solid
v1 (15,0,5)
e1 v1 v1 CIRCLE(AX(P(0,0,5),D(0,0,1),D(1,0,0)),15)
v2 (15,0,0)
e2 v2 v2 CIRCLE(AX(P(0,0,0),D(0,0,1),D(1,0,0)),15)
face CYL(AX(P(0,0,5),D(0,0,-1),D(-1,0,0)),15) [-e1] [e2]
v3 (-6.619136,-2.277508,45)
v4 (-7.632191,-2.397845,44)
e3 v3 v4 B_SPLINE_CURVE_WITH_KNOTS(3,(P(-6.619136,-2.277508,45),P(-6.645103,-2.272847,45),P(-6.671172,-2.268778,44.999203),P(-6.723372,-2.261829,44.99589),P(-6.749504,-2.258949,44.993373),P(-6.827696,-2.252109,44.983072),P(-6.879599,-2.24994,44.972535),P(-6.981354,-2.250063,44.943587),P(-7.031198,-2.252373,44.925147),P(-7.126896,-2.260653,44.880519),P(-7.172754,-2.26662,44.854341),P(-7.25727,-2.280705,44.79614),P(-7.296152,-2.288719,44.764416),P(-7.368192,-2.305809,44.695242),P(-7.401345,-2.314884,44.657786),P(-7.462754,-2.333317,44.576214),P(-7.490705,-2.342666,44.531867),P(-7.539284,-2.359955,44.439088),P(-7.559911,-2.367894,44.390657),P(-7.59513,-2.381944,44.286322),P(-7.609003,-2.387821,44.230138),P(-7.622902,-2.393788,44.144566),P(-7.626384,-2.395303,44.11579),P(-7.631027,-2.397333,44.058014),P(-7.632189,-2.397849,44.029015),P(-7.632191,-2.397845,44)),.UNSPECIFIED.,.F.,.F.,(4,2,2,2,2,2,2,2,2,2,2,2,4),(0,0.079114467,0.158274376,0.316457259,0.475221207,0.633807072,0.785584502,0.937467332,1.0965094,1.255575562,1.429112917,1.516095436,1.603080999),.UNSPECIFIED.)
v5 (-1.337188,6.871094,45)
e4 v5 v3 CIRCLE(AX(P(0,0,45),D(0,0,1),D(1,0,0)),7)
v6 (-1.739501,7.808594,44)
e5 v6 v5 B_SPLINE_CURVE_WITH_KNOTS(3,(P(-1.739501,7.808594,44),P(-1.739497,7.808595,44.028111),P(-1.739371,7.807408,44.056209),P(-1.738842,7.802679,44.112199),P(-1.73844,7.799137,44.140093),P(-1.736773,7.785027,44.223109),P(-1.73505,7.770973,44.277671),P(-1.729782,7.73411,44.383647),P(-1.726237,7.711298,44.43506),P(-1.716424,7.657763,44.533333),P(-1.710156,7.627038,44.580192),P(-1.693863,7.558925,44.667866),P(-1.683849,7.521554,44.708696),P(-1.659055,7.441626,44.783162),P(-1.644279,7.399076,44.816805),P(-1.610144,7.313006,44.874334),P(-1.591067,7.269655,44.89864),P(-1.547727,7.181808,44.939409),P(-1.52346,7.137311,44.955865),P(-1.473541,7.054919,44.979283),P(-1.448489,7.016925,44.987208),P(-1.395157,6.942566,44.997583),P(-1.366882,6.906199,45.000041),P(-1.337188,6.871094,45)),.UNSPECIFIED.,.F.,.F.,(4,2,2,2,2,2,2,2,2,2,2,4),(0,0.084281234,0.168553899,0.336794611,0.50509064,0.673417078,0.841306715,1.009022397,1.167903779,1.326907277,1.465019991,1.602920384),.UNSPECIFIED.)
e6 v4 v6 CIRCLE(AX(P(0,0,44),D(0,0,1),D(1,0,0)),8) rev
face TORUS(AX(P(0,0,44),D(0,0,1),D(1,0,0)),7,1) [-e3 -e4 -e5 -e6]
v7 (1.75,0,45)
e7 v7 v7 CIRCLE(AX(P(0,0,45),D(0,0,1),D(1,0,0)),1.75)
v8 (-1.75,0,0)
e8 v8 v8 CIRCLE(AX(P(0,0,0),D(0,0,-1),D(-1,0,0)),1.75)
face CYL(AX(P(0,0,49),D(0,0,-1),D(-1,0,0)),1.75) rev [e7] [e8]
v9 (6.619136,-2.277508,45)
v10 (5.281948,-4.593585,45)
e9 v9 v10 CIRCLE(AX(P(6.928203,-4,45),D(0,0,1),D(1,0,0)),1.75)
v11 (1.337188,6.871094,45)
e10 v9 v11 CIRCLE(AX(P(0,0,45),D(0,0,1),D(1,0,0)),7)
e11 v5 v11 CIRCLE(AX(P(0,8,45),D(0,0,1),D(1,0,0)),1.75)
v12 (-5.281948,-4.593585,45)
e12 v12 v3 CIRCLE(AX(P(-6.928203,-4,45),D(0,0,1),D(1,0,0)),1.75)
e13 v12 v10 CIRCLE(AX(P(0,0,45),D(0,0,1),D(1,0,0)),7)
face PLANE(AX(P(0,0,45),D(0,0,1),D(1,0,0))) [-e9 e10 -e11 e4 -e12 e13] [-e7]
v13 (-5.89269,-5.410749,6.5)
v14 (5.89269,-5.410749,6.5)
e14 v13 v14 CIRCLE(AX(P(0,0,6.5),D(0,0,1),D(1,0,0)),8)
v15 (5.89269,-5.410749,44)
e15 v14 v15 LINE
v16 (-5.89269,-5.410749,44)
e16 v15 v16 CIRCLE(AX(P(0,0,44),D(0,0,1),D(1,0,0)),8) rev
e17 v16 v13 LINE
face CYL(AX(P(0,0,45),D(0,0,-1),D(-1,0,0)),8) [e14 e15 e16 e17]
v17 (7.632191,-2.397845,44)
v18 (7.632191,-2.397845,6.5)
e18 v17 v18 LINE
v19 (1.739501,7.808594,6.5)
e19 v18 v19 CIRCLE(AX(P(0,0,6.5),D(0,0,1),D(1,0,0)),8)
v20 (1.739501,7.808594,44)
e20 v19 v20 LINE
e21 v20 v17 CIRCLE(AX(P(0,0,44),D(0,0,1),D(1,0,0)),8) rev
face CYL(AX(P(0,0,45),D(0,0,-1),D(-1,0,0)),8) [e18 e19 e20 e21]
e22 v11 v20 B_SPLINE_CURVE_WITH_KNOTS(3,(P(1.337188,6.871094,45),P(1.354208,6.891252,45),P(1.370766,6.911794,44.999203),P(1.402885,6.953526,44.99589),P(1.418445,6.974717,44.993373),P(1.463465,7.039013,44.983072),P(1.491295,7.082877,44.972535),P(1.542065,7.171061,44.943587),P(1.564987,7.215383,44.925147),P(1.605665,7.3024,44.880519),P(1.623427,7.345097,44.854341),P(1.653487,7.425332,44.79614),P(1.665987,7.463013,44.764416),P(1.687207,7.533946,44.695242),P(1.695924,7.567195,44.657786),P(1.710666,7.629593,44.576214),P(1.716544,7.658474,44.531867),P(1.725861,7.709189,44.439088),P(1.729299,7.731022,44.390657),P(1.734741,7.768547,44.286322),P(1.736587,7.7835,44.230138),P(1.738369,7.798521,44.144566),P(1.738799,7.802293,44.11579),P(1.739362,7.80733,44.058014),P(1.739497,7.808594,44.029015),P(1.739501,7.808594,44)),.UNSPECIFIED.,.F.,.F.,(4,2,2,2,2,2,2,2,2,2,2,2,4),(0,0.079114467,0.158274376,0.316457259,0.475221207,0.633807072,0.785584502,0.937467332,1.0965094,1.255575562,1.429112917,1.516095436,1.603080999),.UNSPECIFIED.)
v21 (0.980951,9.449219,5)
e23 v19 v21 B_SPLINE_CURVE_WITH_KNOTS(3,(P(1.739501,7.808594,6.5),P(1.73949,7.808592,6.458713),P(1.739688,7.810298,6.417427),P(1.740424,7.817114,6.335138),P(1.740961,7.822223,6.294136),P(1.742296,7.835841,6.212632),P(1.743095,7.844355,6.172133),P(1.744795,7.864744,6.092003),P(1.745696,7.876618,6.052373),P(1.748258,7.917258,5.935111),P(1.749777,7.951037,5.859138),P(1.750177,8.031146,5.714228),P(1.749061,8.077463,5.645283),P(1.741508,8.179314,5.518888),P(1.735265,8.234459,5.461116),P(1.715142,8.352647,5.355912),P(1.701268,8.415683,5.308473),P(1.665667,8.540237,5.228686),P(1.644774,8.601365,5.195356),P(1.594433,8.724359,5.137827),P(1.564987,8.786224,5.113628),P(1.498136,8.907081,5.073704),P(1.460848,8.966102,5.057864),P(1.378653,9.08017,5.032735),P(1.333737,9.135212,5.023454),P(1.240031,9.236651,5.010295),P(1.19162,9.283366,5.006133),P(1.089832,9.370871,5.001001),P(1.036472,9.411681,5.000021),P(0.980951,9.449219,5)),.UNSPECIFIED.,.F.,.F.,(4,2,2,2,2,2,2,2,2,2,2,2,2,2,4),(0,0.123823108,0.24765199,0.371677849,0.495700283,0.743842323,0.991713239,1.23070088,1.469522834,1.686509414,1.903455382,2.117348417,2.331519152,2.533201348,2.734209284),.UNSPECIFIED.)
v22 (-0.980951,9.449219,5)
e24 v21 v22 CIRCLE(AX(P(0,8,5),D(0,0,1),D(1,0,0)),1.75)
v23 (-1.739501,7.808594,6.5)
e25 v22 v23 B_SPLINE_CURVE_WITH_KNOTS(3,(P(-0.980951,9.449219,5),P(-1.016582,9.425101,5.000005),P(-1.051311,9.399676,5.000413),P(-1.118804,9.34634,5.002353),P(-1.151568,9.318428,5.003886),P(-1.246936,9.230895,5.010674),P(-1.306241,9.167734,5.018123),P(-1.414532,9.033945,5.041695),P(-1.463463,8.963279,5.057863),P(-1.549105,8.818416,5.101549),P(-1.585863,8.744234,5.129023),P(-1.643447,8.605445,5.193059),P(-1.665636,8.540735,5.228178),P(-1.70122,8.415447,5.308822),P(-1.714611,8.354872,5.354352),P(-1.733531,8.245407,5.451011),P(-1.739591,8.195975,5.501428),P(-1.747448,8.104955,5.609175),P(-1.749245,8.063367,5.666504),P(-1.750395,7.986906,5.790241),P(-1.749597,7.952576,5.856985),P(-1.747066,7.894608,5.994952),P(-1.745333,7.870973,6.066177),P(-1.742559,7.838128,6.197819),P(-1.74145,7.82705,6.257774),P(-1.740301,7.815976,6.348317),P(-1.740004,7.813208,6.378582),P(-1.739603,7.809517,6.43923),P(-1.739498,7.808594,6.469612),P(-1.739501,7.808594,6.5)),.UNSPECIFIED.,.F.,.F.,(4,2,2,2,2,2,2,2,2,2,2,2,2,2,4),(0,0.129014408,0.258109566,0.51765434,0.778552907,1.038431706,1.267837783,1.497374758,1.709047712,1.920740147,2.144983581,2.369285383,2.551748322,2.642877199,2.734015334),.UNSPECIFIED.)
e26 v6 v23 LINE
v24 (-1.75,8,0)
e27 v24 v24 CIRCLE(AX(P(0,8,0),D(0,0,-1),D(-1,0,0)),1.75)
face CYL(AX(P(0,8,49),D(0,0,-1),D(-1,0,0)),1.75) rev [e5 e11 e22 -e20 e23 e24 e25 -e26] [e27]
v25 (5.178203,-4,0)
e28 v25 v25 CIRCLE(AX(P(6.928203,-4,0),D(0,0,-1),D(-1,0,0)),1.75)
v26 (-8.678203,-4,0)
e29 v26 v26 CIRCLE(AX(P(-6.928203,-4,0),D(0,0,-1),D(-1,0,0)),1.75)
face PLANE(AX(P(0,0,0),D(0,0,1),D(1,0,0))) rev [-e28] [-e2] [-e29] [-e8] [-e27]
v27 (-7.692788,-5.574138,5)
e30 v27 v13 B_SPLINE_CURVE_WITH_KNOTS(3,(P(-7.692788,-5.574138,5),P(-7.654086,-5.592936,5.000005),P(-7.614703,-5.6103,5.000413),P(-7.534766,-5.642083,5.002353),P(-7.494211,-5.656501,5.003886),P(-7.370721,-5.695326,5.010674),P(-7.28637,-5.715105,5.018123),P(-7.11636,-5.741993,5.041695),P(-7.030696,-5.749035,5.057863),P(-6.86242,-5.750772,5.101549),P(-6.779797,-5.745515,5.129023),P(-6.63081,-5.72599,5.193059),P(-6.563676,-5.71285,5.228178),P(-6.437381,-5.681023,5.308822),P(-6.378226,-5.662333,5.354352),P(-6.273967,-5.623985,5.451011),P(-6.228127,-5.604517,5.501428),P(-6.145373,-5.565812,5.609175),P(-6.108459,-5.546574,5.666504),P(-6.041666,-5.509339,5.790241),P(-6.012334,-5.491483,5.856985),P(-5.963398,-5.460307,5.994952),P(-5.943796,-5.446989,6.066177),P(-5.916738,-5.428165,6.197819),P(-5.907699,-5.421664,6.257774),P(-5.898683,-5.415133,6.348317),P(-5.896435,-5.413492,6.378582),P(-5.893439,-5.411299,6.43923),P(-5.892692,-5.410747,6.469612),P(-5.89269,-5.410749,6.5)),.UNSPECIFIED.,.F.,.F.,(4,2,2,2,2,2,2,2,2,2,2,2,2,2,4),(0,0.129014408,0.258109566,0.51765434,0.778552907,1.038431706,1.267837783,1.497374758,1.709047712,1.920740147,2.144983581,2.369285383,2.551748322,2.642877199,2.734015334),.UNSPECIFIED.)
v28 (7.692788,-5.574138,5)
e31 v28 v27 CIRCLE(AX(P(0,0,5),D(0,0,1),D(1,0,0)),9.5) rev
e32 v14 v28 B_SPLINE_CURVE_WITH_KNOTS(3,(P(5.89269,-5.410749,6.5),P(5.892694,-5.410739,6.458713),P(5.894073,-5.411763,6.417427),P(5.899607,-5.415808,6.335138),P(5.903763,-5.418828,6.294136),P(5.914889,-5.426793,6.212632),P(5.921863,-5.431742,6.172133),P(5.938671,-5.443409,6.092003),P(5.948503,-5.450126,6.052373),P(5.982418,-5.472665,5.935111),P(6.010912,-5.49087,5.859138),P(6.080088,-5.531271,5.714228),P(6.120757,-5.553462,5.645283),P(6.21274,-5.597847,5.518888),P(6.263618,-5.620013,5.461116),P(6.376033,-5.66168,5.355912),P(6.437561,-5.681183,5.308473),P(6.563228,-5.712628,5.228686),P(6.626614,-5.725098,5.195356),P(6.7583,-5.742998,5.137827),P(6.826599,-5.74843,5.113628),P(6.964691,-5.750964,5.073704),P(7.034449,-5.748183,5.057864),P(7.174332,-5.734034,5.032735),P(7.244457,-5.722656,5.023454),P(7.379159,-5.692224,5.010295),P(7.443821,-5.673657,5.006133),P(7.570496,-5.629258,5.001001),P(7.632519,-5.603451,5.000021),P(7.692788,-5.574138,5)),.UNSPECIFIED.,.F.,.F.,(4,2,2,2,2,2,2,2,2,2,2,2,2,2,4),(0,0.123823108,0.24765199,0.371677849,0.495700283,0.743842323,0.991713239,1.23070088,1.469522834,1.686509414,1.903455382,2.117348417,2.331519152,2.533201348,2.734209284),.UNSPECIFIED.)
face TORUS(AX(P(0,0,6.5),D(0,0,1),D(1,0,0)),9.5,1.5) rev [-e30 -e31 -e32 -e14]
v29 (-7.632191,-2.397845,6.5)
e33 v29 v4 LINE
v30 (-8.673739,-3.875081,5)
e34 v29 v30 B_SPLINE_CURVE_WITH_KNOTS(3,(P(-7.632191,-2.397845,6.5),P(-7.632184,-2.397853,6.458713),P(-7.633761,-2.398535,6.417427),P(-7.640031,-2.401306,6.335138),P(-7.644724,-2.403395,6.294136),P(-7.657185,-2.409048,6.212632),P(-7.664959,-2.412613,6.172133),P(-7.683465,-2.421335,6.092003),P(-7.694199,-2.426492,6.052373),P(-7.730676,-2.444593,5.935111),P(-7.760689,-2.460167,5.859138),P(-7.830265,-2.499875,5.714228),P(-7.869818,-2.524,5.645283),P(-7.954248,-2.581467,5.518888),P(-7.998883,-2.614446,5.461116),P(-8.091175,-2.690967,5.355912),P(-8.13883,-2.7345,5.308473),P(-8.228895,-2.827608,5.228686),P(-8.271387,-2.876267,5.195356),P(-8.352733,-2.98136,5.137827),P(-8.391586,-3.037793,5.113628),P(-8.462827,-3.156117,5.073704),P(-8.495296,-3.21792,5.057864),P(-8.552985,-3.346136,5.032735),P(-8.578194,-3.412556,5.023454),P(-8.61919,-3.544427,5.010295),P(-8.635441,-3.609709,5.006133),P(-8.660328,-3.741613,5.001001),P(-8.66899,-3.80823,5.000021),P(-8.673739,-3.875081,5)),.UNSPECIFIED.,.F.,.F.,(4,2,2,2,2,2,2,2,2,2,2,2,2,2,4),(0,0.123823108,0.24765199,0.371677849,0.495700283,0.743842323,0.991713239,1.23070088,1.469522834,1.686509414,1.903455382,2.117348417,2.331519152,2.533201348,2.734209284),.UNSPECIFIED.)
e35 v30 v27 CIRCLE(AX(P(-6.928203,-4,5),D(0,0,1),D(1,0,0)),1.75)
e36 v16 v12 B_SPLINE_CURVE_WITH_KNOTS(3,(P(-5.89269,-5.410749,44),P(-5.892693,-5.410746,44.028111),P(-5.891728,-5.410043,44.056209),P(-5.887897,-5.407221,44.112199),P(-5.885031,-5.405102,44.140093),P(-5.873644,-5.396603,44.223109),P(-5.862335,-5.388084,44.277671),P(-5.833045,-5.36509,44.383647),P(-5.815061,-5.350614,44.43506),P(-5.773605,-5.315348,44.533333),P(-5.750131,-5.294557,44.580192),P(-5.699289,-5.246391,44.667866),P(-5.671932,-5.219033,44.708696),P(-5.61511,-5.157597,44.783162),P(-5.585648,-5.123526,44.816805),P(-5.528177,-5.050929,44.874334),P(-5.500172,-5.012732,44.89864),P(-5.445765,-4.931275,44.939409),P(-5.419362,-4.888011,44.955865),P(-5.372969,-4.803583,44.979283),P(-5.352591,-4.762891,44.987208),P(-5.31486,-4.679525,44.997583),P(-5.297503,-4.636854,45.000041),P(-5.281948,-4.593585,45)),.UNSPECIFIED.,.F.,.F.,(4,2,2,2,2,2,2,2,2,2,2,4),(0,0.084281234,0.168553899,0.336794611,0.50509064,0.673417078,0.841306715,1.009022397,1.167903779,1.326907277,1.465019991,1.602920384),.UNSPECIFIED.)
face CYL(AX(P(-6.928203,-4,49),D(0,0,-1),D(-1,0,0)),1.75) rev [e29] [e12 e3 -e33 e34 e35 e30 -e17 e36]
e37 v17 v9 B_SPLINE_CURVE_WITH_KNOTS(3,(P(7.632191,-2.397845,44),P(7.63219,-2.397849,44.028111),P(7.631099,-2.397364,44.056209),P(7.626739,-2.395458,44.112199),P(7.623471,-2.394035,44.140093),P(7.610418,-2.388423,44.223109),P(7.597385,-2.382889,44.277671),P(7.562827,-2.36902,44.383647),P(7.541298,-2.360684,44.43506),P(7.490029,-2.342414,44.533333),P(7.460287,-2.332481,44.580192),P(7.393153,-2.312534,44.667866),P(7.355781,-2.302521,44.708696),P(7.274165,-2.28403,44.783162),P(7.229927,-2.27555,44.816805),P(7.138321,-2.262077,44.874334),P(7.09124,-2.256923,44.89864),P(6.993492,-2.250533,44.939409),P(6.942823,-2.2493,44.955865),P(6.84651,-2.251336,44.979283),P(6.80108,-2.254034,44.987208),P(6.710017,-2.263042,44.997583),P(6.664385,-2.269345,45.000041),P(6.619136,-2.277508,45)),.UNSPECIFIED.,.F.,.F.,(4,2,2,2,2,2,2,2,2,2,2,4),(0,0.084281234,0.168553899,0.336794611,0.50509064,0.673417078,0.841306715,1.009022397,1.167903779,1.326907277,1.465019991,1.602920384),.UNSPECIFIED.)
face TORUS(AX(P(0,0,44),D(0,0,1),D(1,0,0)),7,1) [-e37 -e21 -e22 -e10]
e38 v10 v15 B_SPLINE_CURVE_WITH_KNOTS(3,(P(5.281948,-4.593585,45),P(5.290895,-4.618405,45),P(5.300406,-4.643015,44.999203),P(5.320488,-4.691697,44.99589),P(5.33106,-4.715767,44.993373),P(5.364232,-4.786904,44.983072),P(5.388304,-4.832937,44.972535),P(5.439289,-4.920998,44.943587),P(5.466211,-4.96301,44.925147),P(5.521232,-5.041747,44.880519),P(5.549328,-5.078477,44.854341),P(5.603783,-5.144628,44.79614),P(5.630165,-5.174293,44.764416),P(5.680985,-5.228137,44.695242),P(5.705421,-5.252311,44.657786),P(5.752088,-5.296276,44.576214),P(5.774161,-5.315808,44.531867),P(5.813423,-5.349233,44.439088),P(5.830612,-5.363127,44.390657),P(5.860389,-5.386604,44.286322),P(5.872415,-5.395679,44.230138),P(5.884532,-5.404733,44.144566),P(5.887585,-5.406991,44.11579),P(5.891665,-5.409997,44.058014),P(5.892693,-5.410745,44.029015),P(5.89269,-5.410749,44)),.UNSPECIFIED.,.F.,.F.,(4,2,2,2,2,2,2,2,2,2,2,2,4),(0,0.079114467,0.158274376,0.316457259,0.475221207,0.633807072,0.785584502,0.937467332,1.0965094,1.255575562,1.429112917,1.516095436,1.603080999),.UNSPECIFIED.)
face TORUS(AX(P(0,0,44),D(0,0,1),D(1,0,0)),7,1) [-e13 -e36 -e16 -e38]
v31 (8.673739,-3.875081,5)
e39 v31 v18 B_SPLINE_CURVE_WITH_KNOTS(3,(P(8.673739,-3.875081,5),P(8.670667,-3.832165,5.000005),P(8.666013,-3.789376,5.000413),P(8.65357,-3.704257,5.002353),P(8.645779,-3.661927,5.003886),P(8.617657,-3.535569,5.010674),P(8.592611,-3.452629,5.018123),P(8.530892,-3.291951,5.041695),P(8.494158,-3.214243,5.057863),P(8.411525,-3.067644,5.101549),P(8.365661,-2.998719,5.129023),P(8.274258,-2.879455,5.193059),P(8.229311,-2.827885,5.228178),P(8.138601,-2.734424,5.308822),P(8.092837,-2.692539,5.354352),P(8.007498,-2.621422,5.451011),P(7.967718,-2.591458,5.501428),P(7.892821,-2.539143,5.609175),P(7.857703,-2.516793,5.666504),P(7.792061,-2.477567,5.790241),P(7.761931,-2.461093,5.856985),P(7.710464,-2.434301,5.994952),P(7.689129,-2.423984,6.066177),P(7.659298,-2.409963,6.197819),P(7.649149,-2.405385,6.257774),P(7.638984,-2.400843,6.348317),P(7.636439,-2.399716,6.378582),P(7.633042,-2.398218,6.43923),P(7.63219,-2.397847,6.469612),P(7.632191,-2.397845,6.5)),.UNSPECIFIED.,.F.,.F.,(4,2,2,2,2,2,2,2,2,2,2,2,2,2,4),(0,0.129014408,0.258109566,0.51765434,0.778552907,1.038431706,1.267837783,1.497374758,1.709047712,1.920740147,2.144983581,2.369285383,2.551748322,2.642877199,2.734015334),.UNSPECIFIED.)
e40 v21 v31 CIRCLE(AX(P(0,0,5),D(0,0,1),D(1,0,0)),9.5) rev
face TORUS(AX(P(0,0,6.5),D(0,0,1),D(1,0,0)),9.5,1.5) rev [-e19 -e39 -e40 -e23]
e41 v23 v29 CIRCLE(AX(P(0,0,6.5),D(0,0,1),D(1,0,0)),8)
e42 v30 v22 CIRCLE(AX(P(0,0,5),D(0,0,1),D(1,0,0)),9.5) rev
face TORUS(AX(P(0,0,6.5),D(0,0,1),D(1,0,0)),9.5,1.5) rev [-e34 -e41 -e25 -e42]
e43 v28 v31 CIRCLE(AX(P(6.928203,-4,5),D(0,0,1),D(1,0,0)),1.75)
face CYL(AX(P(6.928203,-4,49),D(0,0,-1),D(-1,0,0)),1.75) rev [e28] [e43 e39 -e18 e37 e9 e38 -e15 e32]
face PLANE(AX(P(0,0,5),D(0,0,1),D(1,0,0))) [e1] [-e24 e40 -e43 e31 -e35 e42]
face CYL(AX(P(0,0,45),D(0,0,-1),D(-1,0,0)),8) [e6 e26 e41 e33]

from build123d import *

# Parameters (mm, degrees)
SKETCH_1_R          = 15
EXTRUDE_1_DEPTH     = 5
SKETCH_2_R          = 8
EXTRUDE_2_DEPTH     = 40
SKETCH_3_R          = 1.75
CUT_EXTRUDE_1_DEPTH = 49
FILLET_1_R          = 1.5
FILLET_2_R          = 1


with BuildPart() as part:
    # 草图1 → 凸台-拉伸1 (new body)
    with BuildSketch(Plane.XY):
        Circle(SKETCH_1_R)
    extrude(amount=EXTRUDE_1_DEPTH)

    # 草图2 → 凸台-拉伸2 (add)
    with BuildSketch(Plane.XY.offset(5)):
        Circle(SKETCH_2_R)
    extrude(amount=EXTRUDE_2_DEPTH)

    # 草图3 → 切除-拉伸1 (cut)
    with BuildSketch(Plane(origin=(0, 0, 0), x_dir=(-1, 0, 0), z_dir=(0, 0, -1))):
        with Locations((0, 8)):
            Circle(SKETCH_3_R)
        Circle(SKETCH_3_R)
        with Locations((6.92820323, -4)):
            Circle(SKETCH_3_R)
        with Locations((-6.92820323, -4)):
            Circle(SKETCH_3_R)
    extrude(amount=-CUT_EXTRUDE_1_DEPTH, mode=Mode.SUBTRACT)

    # 圆角1
    # the kernel refuses this fillet: 1.5 mm, written as the material it adds along each edge
    with BuildSketch(Plane(origin=(0, 0, 5), x_dir=(0.24718186036796463, 0.968969105753652, 0), z_dir=(0.968969105753652, -0.24718186036796463, 0))) as fillet_1_piece_1_section:
        with BuildLine():
            CenterArc((8 + FILLET_1_R, FILLET_1_R), FILLET_1_R, 180, 90)
            Line((8, FILLET_1_R), (8, 0))
            Line((8, 0), (8 + FILLET_1_R, 0))
        make_face()
    fillet_1_piece_1 = revolve(axis=Axis((0, 0, 5), (0, 0, 1)), revolution_arc=148.621623282, mode=Mode.PRIVATE)
    fillet_1_piece_1 = fillet_1_piece_1 - Plane(origin=(-6.92820323, -4, 5.2649635), x_dir=(-1, 0, 0), z_dir=(0, 0, -1)) * Cylinder(1.75, 39, mode=Mode.PRIVATE)
    fillet_1_piece_1 = fillet_1_piece_1 - Plane(origin=(0, 8, 5.2649635), x_dir=(-1, 0, 0), z_dir=(0, 0, -1)) * Cylinder(1.75, 39, mode=Mode.PRIVATE)
    add(fillet_1_piece_1)
    with BuildSketch(Plane(origin=(0, 0, 5), x_dir=(-0.9627427912489371, -0.27041878244346385, 0), z_dir=(-0.27041878244346385, 0.9627427912489371, 0))) as fillet_1_piece_2_section:
        with BuildLine():
            CenterArc((8 + FILLET_1_R, FILLET_1_R), FILLET_1_R, 180, 90)
            Line((8, FILLET_1_R), (8, 0))
            Line((8, 0), (8 + FILLET_1_R, 0))
        make_face()
    fillet_1_piece_2 = revolve(axis=Axis((0, 0, 5), (0, 0, 1)), revolution_arc=148.621623282, mode=Mode.PRIVATE)
    fillet_1_piece_2 = fillet_1_piece_2 - Plane(origin=(6.92820323, -4, 5.2649635), x_dir=(-1, 0, 0), z_dir=(0, 0, -1)) * Cylinder(1.75, 39, mode=Mode.PRIVATE)
    fillet_1_piece_2 = fillet_1_piece_2 - Plane(origin=(-6.92820323, -4, 5.2649635), x_dir=(-1, 0, 0), z_dir=(0, 0, -1)) * Cylinder(1.75, 39, mode=Mode.PRIVATE)
    add(fillet_1_piece_2)
    with BuildSketch(Plane(origin=(0, 0, 5), x_dir=(-0.24718186036796455, 0.968969105753652, 0), z_dir=(-0.968969105753652, -0.24718186036796455, 0))) as fillet_1_piece_3_section:
        with BuildLine():
            CenterArc((8 + FILLET_1_R, -FILLET_1_R), FILLET_1_R, 90, 90)
            Line((8, -FILLET_1_R), (8, 0))
            Line((8, 0), (8 + FILLET_1_R, 0))
        make_face()
    fillet_1_piece_3 = revolve(axis=Axis((0, 0, 5), (0, 0, -1)), revolution_arc=148.621623282, mode=Mode.PRIVATE)
    fillet_1_piece_3 = fillet_1_piece_3 - Plane(origin=(6.92820323, -4, 5.264963506), x_dir=(-1, 0, 0), z_dir=(0, 0, -1)) * Cylinder(1.75, 39, mode=Mode.PRIVATE)
    fillet_1_piece_3 = fillet_1_piece_3 - Plane(origin=(0, 8, 5.264963506), x_dir=(-1, 0, 0), z_dir=(0, 0, -1)) * Cylinder(1.75, 39, mode=Mode.PRIVATE)
    add(fillet_1_piece_3)

    # 圆角2
    fillet_2_edges = [part.edges().sort_by_distance(p)[0] for p in [
        (-6.92820323, 4, 45),
        (0, -8, 45),
        (6.92820323, 4, 45),
    ]]
    fillet(fillet_2_edges, radius=FILLET_2_R)


solid = part.part
